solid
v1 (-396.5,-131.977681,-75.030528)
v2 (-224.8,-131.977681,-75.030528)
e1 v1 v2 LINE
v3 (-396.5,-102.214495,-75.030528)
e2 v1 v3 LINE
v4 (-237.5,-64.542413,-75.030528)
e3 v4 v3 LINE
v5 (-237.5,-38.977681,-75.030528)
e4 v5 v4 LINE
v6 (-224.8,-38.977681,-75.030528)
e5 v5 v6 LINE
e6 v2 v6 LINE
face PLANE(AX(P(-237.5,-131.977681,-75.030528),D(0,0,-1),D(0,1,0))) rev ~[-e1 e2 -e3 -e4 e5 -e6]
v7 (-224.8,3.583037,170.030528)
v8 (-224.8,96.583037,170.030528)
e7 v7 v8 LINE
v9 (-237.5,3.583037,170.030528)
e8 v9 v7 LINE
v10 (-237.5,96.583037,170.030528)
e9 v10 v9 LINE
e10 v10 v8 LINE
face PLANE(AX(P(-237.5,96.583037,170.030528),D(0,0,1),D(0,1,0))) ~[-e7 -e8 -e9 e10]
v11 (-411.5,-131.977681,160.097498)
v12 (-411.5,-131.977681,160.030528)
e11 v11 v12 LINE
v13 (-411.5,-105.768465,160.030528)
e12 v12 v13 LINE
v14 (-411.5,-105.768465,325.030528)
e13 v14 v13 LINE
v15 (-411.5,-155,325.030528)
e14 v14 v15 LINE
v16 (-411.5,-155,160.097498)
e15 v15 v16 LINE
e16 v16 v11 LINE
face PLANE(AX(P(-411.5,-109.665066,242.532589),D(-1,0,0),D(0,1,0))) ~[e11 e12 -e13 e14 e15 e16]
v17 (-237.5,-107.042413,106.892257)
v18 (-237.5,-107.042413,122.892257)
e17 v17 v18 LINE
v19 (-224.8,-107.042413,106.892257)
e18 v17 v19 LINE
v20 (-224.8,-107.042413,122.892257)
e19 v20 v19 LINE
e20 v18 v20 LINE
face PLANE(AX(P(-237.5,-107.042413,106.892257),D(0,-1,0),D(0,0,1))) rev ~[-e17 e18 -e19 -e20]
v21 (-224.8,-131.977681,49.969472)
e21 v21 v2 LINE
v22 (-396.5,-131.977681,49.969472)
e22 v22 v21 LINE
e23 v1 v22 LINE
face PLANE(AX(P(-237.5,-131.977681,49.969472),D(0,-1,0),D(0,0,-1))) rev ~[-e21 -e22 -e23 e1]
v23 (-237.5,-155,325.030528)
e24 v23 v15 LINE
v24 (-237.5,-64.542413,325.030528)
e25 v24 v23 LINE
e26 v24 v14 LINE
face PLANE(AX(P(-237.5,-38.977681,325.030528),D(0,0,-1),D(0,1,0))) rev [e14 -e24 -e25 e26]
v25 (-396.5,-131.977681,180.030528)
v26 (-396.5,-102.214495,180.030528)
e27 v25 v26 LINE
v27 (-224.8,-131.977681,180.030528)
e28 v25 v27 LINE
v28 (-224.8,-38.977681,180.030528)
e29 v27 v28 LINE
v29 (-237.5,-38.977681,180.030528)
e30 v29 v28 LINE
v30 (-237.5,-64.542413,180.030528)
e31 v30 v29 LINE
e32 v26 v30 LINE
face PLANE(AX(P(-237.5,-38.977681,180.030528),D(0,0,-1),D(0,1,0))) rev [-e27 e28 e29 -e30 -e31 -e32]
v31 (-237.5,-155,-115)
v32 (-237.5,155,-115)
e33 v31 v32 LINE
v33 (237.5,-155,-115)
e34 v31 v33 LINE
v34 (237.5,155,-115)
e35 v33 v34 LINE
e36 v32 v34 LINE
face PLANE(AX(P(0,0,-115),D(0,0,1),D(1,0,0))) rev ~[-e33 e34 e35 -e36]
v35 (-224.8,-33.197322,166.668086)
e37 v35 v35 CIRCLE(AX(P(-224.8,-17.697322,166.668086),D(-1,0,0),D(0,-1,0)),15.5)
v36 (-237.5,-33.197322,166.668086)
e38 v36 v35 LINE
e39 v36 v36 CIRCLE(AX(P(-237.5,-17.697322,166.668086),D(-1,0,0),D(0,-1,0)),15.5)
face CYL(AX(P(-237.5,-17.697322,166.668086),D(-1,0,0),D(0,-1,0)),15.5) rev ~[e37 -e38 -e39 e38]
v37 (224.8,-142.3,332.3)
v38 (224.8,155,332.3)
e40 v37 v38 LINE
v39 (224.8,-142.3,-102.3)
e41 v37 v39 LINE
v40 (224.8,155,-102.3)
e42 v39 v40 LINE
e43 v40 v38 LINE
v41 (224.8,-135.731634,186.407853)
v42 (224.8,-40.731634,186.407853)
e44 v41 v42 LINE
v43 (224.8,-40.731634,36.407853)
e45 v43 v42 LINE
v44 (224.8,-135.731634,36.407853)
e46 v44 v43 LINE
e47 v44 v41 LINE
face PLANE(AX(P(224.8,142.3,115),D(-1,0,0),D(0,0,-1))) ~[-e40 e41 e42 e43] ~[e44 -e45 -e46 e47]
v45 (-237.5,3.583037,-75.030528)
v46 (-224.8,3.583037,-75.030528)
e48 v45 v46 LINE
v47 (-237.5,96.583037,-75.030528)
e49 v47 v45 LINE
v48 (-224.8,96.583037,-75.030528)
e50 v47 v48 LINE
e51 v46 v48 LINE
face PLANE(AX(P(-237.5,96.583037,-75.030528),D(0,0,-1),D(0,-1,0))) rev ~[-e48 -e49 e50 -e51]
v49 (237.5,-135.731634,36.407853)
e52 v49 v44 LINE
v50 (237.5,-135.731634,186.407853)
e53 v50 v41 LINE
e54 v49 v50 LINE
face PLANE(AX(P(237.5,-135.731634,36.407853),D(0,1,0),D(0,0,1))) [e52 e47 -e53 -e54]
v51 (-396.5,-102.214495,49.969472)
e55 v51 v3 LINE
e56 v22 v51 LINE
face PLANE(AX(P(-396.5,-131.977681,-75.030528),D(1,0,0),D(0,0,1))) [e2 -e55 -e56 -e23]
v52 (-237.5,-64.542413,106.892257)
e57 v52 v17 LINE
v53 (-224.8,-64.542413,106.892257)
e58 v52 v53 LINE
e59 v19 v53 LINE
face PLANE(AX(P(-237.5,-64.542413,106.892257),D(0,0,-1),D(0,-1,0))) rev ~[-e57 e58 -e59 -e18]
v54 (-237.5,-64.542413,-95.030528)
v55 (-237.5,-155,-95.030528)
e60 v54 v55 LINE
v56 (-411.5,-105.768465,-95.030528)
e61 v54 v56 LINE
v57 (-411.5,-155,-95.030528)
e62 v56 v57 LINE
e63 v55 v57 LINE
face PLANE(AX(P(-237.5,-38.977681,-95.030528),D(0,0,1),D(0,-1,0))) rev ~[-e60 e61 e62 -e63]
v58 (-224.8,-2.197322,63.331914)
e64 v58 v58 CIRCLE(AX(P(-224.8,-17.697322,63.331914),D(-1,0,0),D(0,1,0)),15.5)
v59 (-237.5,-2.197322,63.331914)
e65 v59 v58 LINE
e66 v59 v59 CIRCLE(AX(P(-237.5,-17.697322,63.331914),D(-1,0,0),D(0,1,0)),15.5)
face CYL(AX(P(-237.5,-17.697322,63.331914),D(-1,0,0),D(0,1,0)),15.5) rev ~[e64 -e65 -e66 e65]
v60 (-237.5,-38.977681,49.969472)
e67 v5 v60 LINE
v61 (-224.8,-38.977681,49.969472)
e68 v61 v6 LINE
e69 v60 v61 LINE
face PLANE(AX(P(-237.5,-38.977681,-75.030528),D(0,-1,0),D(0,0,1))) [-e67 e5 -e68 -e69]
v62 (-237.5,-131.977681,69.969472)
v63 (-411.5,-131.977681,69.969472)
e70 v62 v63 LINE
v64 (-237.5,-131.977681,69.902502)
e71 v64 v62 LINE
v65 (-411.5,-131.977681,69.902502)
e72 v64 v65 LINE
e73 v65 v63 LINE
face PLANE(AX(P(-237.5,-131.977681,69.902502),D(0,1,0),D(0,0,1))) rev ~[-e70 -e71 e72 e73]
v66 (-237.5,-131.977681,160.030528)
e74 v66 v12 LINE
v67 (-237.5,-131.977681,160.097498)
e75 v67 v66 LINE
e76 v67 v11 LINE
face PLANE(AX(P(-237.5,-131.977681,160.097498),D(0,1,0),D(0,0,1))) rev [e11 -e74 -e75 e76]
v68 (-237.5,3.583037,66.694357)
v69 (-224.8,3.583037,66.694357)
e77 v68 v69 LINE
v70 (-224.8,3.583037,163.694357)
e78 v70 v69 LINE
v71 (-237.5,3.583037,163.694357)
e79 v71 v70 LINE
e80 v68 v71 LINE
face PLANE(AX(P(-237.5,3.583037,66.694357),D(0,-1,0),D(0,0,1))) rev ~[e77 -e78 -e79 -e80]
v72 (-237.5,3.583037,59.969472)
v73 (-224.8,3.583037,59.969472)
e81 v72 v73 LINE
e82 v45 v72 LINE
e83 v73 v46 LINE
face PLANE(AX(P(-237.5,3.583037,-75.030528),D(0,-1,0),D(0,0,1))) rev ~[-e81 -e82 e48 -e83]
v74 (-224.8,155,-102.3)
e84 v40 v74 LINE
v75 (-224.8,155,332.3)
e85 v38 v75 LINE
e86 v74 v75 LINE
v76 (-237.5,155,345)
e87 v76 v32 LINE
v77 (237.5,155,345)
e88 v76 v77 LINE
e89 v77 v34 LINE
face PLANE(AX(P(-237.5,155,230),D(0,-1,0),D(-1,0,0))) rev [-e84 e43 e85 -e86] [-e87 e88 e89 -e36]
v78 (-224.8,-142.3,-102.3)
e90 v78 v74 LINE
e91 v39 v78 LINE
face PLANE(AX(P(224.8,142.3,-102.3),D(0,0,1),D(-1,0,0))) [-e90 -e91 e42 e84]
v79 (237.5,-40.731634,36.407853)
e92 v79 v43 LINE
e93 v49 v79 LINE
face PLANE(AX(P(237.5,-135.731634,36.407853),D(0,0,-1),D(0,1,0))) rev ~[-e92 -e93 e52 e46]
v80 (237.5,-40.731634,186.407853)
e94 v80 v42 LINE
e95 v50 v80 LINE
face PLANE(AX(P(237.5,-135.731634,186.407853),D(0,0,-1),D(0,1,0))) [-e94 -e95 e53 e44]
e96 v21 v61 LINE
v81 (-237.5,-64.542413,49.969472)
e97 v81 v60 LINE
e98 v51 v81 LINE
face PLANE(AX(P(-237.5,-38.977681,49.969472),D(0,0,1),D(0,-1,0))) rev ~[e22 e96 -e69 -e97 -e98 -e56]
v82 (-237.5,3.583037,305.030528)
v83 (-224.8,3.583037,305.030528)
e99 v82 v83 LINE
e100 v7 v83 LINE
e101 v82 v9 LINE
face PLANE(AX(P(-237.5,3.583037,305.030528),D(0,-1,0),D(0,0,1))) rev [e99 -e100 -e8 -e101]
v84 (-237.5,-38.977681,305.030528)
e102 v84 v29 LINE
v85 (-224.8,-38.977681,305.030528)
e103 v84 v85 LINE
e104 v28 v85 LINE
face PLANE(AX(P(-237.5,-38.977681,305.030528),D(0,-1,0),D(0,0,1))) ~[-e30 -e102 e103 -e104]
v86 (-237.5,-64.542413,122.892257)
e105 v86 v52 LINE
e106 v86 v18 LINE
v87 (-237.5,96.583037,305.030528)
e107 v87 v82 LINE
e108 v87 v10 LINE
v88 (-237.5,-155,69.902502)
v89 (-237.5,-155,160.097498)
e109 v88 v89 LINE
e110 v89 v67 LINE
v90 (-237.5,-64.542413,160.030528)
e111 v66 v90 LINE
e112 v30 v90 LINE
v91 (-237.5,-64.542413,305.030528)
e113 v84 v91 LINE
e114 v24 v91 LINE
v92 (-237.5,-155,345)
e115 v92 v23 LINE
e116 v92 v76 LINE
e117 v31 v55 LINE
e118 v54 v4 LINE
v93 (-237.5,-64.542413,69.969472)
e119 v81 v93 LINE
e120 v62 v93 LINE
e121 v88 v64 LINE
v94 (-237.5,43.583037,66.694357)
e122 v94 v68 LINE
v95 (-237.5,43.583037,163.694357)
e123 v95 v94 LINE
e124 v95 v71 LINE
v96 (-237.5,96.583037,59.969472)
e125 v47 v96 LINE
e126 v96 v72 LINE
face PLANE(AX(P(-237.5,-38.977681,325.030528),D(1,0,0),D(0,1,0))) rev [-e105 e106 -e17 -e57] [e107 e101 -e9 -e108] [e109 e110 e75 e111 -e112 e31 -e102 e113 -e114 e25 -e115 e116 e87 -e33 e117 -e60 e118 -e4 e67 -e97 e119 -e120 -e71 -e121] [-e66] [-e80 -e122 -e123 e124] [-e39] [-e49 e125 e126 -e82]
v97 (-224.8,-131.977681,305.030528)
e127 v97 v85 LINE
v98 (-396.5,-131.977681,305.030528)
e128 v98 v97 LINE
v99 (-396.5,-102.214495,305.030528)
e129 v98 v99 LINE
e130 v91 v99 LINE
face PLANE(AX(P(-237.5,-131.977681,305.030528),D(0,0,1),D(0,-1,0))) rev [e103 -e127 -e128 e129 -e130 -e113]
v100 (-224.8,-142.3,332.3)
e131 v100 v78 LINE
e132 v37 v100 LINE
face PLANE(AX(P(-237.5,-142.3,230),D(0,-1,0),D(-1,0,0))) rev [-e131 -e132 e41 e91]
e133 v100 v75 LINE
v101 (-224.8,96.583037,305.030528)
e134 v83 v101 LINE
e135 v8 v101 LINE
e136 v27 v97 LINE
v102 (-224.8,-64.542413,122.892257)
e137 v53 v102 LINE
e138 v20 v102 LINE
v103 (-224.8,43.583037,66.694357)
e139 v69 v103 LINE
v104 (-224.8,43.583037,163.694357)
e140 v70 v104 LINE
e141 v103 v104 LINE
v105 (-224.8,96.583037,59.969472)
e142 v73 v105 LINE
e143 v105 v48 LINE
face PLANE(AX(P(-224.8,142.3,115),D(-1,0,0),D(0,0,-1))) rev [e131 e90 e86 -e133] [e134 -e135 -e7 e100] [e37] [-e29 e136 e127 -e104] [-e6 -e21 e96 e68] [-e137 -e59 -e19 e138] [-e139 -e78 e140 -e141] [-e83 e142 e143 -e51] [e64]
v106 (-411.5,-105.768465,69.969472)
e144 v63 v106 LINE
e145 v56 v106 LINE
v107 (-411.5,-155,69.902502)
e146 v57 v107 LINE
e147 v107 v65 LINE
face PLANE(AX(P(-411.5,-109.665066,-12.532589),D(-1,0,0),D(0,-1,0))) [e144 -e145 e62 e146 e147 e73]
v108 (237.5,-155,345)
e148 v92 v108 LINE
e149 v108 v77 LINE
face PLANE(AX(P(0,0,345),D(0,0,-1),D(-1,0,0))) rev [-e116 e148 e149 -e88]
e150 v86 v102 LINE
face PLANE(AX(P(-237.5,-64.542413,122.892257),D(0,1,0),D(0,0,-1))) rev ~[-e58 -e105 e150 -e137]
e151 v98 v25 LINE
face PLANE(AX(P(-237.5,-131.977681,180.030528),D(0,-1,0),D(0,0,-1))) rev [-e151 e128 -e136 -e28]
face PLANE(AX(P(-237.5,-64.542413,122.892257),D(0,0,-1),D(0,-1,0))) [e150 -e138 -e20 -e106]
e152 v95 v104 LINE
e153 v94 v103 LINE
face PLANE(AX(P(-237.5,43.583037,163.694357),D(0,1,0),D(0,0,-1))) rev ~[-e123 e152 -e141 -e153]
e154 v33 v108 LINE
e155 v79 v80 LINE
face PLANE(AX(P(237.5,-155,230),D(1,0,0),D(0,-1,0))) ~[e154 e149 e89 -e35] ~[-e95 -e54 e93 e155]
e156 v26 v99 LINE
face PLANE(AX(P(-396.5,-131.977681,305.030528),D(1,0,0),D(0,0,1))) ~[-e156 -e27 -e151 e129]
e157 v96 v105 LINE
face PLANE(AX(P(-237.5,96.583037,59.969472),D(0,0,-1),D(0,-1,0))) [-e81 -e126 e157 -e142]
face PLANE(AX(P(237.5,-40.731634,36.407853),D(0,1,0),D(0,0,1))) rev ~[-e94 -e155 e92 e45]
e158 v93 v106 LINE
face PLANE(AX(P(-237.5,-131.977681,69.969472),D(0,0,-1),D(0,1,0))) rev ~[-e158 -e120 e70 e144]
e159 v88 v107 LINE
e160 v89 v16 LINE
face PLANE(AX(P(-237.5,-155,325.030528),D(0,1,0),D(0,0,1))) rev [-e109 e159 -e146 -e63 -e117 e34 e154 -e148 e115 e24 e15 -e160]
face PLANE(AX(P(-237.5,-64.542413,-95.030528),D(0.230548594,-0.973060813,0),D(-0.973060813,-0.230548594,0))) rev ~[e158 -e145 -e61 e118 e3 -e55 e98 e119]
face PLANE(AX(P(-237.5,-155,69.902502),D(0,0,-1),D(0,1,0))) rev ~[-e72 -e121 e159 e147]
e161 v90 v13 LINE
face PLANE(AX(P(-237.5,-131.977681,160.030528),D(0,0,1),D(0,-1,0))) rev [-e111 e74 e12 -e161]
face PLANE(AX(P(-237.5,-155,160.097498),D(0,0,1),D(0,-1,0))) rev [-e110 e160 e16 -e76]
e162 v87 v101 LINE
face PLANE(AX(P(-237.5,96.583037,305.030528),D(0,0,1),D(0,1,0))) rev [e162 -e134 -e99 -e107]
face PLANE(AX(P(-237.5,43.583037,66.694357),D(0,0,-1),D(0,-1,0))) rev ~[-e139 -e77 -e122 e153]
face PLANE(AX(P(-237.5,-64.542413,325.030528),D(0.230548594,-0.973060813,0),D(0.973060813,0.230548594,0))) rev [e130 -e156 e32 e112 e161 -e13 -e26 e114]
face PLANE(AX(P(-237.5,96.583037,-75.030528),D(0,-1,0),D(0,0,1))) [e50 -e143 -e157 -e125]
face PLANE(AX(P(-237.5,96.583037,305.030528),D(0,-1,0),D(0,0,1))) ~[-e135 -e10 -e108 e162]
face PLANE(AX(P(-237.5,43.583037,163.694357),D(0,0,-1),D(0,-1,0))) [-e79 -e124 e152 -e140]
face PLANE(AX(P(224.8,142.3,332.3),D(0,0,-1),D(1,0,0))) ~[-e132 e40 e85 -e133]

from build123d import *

# Parameters (mm, degrees)
F0_W      = 475
F0_H      = 310
F1_DEPTH  = 115
F2_T      = -12.7
F3_W      = 93
F3_H      = 125
F3_H_2    = 135
F4_DEPTH  = 25
F5_DEPTH  = 25
F7_DEPTH  = 174
F8_W      = 15
F8_H      = 125
F10_DEPTH = 35
F11_DEPTH = 363
F13_W     = 42.5
F13_H     = 7.8922572035
F13_W_2   = 40
F13_H_2   = 48.3056434989
F13_H_3   = 48.6943565011
F13_H_4   = 8.1077427965
F14_DEPTH = 25
F15_W     = 95
F15_H     = 150
F16_DEPTH = 25
F13_R     = 15.5
F17_DEPTH = 25


# Not quite as in the source:
# - a feature names something its author has since deleted; it is built from what else it names


with BuildPart() as f1:
    # F0 (on Top) → F1 (new body, symmetric)
    with BuildSketch(Plane.XY):
        Rectangle(F0_W, F0_H)
    extrude(amount=F1_DEPTH, both=True)

    # F2
    f2_openings = [f1.faces().sort_by_distance(p)[0] for p in [
        (0, 0, 115),
    ]]
    offset(amount=F2_T, openings=f2_openings)

    # F3 (on face) → F4 (cut)
    with BuildSketch(Plane(origin=(-237.5, 0, 0), x_dir=(0, -1, 0), z_dir=(-1, 0, 0))):
        with Locations((85.4776808544, -12.5305280089)):
            Rectangle(F3_W, F3_H)
        with Locations((-50.0830374043, -7.5305280089)):
            Rectangle(F3_W, F3_H_2)
    extrude(amount=-F4_DEPTH, mode=Mode.SUBTRACT)

    # F5 (cut): a face of the model
    f5_faces = [f1.faces().sort_by_distance(p)[0] for p in [
        (0, 142.3, 6.35),
    ]]
    extrude(f5_faces, amount=-F5_DEPTH, mode=Mode.SUBTRACT)

    # F6 (on face) → F7 (join)
    with BuildSketch(Plane(origin=(-237.5, 0, 0), x_dir=(0, -1, 0), z_dir=(-1, 0, 0))):
        Polygon((131.9776808544, -75.0305280089), (38.9776808544, -75.0305280089), (38.9776808544, -95.0305280089), (131.9776808544, -95.0305280089), (155, -95.0305280089), (155, 69.9025020003), (131.9776808544, 69.9025020003), (131.9776808544, 69.9694719911), (38.9776808544, 69.9694719911), (38.9776808544, 49.9694719911), (131.9776808544, 49.9694719911), align=None)
    extrude(amount=F7_DEPTH)

    # F8 (on face) → F10 (join)
    with BuildSketch(Plane(origin=(0, -131.9776808544, 0), x_dir=(-1, 0, 0), z_dir=(0, 1, 0))):
        with Locations((404, -12.5305280089)):
            Rectangle(F8_W, F8_H)
    extrude(amount=F10_DEPTH)

    # F9 (on face) → F11 (cut)
    with BuildSketch(Plane(origin=(0, 0, -95.0305280089), x_dir=(1, 0, 0), z_dir=(0, 0, -1))):
        Polygon((-411.5, 38.9776808544), (-237.5, 38.9776808544), (-237.5, 64.5424127579), (-411.5, 105.7684645057), align=None)
    extrude(amount=-F11_DEPTH, mode=Mode.SUBTRACT)

    # F12: F1 across face


with BuildPart() as f1_1:
    add(f1.part)
    add(f1.part.mirror(Plane(origin=(0, -62.4841436051, 115), x_dir=(1, 0, 0), z_dir=(0, 0, 1))))

    # F13 (on face) → F14 (cut)
    with BuildSketch(Plane(origin=(-237.5, 0, 0), x_dir=(0, -1, 0), z_dir=(-1, 0, 0))):
        with Locations((85.7924127579, 118.9461286017)):
            Rectangle(F13_W, F13_H)
        with Locations((-23.5830374043, 90.8471782506)):
            Rectangle(F13_W_2, F13_H_2)
        with Locations((-23.5830374043, 139.3471782506)):
            Rectangle(F13_W_2, F13_H_3)
        with Locations((85.7924127579, 110.9461286017)):
            Rectangle(F13_W, F13_H_4)
    extrude(amount=-F14_DEPTH, mode=Mode.SUBTRACT)

    # F15 (on face) → F16 (cut)
    with BuildSketch(Plane.YZ.offset(237.5)):
        with Locations((-88.2316343486, 111.4078534107)):
            Rectangle(F15_W, F15_H)
    extrude(amount=-F16_DEPTH, mode=Mode.SUBTRACT)

    # F13 (on face) → F17 (cut)
    with BuildSketch(Plane(origin=(-237.5, 0, 0), x_dir=(0, -1, 0), z_dir=(-1, 0, 0))):
        with Locations((17.697321725, 166.6680857539)):
            Circle(F13_R)
        with BuildLine():
            ThreePointArc((33.197321725, 63.3319142461), (17.697321725, 78.8319142461), (2.197321725, 63.3319142461))
            Line((2.197321725, 63.3319142461), (17.697321725, 63.3319142461))
            Line((17.697321725, 63.3319142461), (33.197321725, 63.3319142461))
        make_face()
        with BuildLine():
            Line((17.697321725, 63.3319142461), (2.197321725, 63.3319142461))
            ThreePointArc((2.197321725, 63.3319142461), (17.697321725, 47.8319142461), (33.197321725, 63.3319142461))
            Line((33.197321725, 63.3319142461), (17.697321725, 63.3319142461))
        make_face()
    extrude(amount=-F17_DEPTH, mode=Mode.SUBTRACT)


solid = f1_1.part
